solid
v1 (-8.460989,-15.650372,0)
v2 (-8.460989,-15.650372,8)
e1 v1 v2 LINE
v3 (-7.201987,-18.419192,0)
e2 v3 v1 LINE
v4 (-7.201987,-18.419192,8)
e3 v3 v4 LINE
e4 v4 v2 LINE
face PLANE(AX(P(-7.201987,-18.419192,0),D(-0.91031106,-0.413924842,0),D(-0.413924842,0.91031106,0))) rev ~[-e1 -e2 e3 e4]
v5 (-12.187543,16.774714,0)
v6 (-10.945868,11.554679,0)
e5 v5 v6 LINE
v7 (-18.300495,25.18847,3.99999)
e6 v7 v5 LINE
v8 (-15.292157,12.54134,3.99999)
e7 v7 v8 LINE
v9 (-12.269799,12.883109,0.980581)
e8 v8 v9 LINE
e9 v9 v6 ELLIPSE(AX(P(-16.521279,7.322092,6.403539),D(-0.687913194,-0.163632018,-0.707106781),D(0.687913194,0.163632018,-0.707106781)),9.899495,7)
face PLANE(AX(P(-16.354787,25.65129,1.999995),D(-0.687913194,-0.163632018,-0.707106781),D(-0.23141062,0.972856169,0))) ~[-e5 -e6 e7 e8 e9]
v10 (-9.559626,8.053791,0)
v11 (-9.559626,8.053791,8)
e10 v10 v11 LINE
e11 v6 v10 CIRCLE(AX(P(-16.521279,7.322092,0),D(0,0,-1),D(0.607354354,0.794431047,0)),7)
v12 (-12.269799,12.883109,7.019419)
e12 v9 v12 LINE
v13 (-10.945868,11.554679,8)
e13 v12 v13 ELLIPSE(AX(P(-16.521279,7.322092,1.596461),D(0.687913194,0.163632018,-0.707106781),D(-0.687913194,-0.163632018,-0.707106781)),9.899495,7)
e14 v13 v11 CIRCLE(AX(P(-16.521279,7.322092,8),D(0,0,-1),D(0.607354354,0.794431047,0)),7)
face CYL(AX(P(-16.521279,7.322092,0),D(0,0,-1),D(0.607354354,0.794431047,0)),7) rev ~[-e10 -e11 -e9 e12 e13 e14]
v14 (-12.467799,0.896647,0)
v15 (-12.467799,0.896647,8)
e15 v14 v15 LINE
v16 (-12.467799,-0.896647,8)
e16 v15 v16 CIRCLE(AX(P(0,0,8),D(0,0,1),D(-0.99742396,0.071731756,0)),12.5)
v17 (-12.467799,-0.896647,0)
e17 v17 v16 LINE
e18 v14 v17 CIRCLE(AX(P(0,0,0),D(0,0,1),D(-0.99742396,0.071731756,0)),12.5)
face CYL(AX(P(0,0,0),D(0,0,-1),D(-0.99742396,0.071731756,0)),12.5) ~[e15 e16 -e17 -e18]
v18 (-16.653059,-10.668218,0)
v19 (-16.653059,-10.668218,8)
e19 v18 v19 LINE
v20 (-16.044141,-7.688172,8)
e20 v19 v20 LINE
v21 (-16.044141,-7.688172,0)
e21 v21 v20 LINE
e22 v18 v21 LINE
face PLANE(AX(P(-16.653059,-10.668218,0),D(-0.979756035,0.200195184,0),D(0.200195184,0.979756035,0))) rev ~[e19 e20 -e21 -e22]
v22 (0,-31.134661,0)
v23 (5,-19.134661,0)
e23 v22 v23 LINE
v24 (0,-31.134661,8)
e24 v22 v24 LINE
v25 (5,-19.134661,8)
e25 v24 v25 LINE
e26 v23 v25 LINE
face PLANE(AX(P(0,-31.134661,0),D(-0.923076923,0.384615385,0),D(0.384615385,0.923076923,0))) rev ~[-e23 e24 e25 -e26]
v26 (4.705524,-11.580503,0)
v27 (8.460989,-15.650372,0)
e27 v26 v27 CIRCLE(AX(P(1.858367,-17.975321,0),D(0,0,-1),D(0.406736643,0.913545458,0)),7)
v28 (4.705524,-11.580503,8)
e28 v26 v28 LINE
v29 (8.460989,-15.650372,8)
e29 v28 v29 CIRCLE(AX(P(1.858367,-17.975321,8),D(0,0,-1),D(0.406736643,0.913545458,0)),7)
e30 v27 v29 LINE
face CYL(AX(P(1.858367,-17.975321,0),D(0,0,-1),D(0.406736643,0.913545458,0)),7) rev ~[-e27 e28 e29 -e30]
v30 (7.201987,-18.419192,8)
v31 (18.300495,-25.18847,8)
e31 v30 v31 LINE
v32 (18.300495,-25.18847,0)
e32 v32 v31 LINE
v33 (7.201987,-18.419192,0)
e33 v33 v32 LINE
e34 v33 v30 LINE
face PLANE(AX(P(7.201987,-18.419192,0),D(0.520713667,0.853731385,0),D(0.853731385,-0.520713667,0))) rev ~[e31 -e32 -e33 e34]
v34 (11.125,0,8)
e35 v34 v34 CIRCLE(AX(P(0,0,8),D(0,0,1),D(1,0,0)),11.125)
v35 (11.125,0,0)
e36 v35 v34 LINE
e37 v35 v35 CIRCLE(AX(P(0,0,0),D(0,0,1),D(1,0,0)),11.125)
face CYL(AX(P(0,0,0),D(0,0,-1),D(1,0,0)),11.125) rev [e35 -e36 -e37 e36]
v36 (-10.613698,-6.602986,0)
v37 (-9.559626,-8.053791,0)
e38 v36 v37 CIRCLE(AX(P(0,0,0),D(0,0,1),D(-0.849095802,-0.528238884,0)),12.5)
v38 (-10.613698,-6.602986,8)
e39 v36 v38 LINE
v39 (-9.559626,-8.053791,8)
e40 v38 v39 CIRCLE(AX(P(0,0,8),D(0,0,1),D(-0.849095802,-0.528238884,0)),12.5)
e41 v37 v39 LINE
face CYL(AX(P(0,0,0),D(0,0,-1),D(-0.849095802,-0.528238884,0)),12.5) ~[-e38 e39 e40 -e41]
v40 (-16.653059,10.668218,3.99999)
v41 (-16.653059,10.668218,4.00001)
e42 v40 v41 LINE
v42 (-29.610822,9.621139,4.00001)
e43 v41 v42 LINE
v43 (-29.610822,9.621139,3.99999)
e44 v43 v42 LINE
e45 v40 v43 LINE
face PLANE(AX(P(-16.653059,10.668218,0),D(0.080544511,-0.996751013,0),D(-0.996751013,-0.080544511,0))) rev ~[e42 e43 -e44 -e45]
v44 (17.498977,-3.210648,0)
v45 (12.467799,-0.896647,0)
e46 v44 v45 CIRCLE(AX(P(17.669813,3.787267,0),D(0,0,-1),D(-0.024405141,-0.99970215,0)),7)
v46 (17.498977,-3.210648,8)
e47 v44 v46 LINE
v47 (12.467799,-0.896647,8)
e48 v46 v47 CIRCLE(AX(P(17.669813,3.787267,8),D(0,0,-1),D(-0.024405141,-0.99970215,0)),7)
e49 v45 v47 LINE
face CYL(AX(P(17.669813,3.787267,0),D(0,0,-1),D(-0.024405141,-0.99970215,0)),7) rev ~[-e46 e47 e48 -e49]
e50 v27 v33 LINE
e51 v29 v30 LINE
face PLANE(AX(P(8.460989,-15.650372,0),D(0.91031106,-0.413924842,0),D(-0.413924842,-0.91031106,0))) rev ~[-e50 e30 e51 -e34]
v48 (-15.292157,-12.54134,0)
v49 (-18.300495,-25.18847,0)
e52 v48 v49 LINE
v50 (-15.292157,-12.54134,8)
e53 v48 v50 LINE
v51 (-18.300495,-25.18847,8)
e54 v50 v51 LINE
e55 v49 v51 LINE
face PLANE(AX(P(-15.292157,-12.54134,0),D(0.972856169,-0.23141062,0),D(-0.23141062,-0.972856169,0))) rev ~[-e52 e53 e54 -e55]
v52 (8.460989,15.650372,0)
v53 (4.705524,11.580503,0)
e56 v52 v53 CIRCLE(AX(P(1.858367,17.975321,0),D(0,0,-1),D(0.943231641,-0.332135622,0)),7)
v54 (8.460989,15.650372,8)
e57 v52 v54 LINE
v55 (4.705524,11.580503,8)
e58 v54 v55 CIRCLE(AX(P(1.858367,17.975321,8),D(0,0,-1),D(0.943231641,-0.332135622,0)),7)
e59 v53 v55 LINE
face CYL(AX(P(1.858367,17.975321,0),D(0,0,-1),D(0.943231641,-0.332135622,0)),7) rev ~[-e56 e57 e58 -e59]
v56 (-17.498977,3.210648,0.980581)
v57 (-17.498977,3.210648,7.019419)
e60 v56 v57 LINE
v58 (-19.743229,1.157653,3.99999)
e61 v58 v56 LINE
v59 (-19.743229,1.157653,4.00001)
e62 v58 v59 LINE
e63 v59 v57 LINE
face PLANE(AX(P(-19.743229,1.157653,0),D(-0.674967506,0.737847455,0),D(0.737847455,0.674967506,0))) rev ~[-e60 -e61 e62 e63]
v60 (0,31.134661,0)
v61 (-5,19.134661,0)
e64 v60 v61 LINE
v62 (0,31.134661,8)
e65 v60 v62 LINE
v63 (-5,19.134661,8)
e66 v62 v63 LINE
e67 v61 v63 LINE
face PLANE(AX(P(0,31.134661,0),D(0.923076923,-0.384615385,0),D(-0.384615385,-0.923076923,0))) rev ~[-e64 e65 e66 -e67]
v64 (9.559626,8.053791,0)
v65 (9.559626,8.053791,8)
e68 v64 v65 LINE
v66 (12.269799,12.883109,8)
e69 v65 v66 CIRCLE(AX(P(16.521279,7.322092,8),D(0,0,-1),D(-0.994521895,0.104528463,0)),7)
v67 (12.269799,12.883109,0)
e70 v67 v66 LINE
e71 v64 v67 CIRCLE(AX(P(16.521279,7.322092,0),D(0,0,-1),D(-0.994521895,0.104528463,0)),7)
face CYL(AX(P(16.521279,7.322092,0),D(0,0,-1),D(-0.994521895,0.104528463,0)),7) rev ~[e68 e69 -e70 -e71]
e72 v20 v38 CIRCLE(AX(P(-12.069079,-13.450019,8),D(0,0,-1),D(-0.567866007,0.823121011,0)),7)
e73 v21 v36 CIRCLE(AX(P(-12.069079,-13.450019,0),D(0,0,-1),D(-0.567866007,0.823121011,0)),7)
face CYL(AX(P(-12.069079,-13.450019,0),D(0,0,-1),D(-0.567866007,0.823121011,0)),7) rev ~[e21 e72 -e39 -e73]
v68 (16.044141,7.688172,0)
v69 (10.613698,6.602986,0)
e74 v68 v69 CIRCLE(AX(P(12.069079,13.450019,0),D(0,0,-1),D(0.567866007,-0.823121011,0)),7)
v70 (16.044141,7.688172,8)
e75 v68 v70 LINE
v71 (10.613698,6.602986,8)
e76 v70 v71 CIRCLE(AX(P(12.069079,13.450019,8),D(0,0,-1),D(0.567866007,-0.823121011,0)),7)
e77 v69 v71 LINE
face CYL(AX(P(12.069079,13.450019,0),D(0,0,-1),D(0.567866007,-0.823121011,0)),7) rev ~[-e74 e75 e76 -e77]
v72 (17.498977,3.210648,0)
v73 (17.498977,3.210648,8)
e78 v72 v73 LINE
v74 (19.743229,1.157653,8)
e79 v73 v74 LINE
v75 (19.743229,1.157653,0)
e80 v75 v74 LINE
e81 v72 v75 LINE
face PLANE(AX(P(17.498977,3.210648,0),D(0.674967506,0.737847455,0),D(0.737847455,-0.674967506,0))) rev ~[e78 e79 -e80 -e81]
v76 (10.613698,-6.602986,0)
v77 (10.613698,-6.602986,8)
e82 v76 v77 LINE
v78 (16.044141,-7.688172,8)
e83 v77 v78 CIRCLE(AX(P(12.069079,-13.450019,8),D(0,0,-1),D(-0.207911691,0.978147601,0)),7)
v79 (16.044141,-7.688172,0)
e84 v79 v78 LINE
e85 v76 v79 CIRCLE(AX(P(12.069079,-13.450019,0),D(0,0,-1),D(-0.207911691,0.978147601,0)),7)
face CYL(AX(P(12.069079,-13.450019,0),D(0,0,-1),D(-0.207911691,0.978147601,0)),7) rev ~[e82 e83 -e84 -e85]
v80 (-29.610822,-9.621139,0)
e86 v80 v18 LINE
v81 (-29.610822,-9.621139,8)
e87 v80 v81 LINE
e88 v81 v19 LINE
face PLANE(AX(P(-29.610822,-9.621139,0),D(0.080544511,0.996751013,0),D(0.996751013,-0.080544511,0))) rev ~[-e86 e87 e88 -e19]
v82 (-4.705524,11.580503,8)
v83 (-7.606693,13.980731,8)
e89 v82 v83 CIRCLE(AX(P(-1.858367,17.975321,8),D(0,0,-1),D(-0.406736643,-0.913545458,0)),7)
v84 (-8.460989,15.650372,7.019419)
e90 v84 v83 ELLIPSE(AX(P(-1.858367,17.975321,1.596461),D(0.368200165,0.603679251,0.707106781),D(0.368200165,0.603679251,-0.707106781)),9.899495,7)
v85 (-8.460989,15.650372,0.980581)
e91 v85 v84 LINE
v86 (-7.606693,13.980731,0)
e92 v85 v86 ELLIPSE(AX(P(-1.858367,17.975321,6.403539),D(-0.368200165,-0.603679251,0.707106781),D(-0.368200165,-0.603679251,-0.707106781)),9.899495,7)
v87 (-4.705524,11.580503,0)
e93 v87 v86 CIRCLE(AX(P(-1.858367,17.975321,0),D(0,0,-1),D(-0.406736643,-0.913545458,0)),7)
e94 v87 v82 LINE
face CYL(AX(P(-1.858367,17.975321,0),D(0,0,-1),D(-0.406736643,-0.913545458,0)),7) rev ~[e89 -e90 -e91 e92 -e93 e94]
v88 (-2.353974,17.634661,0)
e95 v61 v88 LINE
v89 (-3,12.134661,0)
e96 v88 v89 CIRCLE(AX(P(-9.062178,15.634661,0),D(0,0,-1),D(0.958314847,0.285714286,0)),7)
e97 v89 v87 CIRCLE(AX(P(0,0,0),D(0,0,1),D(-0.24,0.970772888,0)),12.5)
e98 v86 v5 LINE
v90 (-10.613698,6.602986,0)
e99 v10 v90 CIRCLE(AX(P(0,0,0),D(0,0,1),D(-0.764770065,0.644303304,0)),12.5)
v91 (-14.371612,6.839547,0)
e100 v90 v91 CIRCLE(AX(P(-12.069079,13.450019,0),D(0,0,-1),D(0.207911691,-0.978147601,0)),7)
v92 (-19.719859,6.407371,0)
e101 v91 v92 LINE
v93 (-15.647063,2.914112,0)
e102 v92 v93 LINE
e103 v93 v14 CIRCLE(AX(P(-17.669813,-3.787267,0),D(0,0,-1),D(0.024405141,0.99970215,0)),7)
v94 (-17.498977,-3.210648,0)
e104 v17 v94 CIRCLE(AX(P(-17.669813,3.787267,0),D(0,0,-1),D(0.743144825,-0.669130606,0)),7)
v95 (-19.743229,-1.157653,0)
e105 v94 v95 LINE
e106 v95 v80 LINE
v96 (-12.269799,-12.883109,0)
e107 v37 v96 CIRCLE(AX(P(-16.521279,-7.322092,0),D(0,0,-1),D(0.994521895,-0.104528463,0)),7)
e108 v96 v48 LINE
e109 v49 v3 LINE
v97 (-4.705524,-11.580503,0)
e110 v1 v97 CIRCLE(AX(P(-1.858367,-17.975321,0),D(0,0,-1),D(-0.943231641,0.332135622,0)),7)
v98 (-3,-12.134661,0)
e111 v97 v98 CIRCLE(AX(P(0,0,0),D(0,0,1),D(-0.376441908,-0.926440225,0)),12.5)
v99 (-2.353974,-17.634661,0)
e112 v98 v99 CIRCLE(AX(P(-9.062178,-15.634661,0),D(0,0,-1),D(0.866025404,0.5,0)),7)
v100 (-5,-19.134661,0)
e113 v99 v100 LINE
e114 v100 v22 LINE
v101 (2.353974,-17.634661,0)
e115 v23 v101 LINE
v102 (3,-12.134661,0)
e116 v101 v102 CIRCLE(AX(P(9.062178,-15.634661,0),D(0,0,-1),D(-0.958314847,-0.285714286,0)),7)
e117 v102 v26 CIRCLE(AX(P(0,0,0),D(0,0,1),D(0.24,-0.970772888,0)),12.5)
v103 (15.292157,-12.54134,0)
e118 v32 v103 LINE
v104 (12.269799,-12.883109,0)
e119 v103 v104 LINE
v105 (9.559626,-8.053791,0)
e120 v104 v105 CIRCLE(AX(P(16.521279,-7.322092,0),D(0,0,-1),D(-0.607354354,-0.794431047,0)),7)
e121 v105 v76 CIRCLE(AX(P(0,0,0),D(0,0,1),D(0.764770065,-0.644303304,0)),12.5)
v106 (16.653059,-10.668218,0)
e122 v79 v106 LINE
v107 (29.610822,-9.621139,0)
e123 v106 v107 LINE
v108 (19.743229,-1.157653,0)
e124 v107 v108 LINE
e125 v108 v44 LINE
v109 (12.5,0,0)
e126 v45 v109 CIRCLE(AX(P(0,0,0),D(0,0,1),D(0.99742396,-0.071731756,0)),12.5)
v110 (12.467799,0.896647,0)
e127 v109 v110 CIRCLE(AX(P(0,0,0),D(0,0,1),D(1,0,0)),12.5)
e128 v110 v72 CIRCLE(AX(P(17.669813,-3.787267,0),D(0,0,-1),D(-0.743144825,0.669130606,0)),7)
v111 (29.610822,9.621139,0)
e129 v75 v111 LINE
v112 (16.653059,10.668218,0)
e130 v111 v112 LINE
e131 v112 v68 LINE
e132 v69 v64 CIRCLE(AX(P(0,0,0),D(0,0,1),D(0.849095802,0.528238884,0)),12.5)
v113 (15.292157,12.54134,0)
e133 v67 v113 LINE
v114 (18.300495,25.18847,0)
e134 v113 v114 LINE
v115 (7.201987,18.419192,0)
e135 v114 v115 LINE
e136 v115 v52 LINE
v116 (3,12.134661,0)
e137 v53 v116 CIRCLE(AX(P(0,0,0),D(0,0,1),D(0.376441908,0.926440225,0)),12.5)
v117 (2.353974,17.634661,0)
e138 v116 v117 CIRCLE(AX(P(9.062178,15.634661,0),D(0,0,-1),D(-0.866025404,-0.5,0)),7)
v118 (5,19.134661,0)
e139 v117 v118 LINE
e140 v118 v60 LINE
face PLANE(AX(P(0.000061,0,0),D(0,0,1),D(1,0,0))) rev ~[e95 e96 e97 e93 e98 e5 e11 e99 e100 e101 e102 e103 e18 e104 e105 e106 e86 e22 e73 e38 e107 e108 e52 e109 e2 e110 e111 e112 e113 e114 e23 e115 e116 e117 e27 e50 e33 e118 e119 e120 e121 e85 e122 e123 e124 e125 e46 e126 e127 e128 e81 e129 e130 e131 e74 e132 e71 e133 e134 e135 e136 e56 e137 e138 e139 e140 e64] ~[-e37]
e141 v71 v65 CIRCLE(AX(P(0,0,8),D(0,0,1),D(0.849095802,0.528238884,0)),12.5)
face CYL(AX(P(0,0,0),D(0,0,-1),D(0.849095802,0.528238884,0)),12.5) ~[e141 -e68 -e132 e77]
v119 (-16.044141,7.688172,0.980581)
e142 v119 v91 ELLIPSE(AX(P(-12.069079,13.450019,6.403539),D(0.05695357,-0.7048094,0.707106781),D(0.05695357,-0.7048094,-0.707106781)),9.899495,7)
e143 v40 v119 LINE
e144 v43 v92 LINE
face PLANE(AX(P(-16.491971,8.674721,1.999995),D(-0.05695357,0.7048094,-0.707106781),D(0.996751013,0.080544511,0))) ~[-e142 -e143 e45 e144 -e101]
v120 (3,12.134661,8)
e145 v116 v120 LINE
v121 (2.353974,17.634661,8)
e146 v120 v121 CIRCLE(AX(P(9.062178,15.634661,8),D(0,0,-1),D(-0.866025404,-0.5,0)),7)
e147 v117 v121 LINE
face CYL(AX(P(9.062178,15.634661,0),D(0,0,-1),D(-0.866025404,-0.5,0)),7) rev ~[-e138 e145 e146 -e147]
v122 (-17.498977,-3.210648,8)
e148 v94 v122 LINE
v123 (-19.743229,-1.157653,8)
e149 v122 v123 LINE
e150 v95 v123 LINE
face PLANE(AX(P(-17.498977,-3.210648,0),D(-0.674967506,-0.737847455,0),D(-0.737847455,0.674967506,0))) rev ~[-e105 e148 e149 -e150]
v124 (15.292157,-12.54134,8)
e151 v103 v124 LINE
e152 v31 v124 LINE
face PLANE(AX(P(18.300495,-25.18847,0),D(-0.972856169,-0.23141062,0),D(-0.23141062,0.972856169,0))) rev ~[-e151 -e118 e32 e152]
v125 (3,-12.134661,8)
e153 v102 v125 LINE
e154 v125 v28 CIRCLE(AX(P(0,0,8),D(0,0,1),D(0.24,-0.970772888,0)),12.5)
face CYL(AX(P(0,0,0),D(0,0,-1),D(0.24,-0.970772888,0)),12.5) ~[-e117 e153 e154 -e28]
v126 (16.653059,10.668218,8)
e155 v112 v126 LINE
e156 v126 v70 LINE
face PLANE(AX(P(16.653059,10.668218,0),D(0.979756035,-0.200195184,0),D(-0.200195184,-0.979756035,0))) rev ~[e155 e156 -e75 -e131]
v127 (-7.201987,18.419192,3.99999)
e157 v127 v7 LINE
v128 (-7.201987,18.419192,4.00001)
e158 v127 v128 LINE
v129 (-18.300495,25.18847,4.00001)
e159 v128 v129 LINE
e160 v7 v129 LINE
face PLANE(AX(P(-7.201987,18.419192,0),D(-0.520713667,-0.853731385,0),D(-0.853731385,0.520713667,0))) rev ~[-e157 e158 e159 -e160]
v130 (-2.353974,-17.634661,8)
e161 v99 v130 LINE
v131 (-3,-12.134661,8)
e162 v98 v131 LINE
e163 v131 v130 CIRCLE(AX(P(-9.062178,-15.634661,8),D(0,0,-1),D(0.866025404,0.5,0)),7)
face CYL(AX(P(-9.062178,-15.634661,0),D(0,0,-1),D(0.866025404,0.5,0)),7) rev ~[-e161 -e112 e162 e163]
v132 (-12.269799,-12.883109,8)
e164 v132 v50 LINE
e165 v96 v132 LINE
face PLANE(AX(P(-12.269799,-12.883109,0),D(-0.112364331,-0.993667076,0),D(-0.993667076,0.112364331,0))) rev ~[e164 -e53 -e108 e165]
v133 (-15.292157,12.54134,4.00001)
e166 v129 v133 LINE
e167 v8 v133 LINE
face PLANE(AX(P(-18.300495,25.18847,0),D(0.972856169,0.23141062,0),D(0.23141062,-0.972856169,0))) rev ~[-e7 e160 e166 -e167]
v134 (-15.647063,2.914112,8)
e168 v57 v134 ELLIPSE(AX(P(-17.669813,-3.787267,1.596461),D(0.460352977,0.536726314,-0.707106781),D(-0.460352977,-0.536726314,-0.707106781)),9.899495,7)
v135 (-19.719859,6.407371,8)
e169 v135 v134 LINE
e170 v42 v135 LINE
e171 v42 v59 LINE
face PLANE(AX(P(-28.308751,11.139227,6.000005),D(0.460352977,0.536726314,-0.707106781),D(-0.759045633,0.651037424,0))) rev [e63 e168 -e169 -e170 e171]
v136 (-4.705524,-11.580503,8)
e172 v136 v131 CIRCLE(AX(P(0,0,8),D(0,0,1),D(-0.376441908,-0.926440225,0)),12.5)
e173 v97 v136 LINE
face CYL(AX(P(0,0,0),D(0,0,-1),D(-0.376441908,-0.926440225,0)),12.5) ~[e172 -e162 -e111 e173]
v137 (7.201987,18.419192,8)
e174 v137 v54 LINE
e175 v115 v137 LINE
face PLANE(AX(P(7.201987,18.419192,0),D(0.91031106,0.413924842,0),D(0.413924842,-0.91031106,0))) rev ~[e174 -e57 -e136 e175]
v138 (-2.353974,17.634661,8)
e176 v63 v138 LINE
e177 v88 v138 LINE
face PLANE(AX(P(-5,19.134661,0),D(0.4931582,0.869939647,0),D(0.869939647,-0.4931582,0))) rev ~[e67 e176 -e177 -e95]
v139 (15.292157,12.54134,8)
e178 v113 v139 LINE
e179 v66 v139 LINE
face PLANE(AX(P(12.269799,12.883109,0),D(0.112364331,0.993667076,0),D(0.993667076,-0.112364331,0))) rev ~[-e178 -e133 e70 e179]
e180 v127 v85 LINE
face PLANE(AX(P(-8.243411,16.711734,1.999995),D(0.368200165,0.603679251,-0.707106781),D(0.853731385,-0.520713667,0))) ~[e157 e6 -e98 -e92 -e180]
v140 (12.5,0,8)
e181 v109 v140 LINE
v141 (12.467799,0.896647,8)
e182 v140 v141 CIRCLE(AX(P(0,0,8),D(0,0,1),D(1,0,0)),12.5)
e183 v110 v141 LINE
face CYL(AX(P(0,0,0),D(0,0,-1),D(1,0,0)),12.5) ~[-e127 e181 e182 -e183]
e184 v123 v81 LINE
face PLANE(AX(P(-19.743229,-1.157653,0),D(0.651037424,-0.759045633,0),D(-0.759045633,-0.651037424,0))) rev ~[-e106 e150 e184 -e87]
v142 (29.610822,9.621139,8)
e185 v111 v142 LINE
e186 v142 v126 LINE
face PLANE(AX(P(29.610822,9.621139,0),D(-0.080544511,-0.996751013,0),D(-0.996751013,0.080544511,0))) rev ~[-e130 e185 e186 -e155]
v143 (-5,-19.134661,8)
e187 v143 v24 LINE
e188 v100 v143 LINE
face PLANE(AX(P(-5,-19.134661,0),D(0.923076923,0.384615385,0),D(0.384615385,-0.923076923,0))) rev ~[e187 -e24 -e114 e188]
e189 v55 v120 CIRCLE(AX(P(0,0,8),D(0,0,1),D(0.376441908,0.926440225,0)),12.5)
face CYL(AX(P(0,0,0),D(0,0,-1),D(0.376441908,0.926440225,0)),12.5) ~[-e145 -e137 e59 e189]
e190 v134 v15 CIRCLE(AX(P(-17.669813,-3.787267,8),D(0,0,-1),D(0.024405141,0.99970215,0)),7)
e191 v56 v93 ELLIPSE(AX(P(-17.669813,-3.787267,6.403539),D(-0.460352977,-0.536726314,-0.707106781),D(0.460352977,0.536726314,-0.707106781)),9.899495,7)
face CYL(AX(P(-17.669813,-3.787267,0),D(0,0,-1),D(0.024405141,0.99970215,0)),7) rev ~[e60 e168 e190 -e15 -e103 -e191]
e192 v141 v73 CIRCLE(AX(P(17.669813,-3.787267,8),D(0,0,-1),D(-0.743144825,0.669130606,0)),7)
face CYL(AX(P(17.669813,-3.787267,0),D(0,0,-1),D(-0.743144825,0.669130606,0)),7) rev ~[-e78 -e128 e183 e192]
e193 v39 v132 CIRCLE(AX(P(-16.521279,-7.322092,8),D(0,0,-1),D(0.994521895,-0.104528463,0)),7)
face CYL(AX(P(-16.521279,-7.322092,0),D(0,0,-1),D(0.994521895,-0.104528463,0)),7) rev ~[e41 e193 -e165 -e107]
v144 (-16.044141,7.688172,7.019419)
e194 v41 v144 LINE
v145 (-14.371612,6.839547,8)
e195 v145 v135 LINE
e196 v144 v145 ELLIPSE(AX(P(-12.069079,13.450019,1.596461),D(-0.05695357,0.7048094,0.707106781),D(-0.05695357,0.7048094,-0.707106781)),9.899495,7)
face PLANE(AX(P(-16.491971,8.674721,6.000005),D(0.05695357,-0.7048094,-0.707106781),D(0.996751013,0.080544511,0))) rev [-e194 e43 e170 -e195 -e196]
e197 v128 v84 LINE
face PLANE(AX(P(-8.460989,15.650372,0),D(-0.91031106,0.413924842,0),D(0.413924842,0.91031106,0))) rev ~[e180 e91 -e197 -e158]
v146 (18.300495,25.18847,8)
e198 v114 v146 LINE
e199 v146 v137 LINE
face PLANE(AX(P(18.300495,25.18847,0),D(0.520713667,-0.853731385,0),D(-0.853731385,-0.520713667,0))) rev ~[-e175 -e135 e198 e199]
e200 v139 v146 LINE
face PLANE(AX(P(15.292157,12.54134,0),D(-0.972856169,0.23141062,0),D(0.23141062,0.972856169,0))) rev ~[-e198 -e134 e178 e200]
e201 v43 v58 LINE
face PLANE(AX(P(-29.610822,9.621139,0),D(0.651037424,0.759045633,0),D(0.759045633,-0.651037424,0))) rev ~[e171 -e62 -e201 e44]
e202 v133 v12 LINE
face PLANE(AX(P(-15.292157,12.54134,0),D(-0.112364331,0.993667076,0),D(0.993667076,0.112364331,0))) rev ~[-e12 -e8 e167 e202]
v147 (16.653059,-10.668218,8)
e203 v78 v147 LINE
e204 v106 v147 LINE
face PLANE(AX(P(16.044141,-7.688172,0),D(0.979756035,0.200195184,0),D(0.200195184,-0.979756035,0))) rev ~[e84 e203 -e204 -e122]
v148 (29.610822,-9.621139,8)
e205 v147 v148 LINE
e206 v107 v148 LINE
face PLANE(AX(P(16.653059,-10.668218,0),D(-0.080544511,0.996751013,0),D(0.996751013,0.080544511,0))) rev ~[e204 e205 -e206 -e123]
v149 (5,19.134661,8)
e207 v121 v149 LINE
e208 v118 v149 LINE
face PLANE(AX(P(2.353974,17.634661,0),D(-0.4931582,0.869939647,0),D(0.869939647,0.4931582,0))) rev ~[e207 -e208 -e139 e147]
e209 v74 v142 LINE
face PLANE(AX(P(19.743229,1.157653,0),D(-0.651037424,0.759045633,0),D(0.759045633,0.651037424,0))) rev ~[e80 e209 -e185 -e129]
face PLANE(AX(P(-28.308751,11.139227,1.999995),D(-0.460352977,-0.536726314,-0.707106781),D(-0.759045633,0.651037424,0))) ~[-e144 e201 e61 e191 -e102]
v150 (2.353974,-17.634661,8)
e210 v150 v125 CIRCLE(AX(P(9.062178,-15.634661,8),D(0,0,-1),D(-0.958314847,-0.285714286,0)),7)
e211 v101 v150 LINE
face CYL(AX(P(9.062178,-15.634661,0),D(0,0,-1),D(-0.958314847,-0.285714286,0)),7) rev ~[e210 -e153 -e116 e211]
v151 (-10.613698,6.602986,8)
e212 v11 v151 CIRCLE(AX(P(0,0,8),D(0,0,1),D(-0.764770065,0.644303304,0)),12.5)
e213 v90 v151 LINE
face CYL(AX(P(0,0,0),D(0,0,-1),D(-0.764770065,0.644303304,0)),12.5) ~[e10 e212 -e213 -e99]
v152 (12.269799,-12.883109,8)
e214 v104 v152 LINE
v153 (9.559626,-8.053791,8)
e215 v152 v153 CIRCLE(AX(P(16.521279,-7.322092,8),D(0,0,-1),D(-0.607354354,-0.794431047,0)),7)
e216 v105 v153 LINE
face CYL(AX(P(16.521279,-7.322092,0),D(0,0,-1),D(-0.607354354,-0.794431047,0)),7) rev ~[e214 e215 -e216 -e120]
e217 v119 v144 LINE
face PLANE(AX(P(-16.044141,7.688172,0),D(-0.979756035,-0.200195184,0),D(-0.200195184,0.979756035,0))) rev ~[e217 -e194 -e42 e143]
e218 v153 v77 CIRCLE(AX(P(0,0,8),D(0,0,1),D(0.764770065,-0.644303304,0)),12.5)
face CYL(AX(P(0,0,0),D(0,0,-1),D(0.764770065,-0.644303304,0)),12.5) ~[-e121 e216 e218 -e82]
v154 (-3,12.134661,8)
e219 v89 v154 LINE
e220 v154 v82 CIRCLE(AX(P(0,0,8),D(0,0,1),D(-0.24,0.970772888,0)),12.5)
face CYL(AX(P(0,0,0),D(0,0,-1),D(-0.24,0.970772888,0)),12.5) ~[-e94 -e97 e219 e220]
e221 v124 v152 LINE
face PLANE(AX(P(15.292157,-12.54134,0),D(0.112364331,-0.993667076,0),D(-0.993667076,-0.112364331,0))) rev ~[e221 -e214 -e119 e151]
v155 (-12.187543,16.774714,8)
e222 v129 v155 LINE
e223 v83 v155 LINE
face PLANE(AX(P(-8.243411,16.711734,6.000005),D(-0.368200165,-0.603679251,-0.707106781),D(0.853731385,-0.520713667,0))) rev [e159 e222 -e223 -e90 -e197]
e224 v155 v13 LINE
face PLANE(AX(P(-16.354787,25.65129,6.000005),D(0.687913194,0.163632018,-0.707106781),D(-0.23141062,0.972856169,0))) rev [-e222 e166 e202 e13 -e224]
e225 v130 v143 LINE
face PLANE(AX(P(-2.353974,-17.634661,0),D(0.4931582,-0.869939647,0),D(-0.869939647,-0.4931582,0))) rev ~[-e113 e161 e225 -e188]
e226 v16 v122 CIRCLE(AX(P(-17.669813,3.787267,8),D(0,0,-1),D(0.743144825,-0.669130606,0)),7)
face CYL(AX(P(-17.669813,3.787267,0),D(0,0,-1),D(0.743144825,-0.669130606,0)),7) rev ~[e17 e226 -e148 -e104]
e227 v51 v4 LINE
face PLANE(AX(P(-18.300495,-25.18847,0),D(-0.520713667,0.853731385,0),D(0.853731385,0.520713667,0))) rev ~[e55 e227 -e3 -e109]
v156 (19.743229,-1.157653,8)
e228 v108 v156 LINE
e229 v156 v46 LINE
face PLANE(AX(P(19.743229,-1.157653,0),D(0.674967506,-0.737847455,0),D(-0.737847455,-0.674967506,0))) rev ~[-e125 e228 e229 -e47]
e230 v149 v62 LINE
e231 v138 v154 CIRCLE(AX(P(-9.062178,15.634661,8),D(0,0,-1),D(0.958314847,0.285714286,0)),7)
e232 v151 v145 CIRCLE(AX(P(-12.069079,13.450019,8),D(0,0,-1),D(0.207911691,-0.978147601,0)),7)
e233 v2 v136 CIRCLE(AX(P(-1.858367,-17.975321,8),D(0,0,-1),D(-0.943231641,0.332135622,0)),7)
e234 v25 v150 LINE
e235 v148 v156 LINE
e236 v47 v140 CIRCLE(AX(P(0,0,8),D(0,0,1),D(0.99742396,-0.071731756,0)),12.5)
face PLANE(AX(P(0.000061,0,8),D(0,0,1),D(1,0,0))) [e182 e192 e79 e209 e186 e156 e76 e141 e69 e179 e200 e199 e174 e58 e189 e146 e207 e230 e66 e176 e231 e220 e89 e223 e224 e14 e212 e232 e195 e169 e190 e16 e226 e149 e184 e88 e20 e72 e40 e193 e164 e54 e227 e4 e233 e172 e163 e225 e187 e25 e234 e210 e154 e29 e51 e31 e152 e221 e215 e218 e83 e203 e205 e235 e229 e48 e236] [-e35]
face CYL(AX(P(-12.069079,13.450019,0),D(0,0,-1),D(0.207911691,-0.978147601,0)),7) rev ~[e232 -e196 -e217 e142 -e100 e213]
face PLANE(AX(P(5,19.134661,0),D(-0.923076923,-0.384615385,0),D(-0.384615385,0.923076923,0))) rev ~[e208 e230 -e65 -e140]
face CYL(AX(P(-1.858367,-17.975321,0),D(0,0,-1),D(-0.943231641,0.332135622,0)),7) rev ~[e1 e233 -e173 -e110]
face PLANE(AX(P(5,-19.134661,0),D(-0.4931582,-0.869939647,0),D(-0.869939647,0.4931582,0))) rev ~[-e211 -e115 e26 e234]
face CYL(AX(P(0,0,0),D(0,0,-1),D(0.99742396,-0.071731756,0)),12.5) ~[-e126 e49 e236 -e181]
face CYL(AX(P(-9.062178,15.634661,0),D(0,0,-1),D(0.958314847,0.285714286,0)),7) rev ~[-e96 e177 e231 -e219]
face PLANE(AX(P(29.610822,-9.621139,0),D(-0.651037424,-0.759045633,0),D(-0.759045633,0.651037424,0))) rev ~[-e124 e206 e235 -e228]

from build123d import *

# Parameters (mm, degrees)
F0_R     = 11.125
F1_DEPTH = 8
F2_SIZE  = 3.99999


# Not quite as in the source:
# - a fillet or chamfer is up to 0.001 mm smaller than in the source, because OpenCascade refuses the exact size


with BuildPart() as f1:
    # F0 (on Top) → F1 (new body)
    with BuildSketch(Plane.XY):
        with BuildLine():
            ThreePointArc((12.4677994948, -0.8966469518), (12.4919472799, -0.44861248), (12.5, 0))
            ThreePointArc((12.5, 0), (12.4919472799, 0.44861248), (12.4677994948, 0.8966469518))
            ThreePointArc((12.4677994948, 0.8966469518), (11.8882064537, 3.8627124297), (10.6136975286, 6.6029860496))
            ThreePointArc((10.6136975286, 6.6029860496), (10.1127124297, 7.3473156537), (9.559625819, 8.0537912936))
            ThreePointArc((9.559625819, 8.0537912936), (7.3473156537, 10.1127124297), (4.7055238527, 11.5805028074))
            ThreePointArc((4.7055238527, 11.5805028074), (3.8627124297, 11.8882064537), (3, 12.1346610995))
            ThreePointArc((3, 12.1346610995), (0, 12.5), (-3, 12.1346610995))
            ThreePointArc((-3, 12.1346610995), (-3.8627124297, 11.8882064537), (-4.7055238527, 11.5805028074))
            ThreePointArc((-4.7055238527, 11.5805028074), (-7.3473156537, 10.1127124297), (-9.559625819, 8.0537912936))
            ThreePointArc((-9.559625819, 8.0537912936), (-10.1127124297, 7.3473156537), (-10.6136975286, 6.6029860496))
            ThreePointArc((-10.6136975286, 6.6029860496), (-11.8882064537, 3.8627124297), (-12.4677994948, 0.8966469518))
            ThreePointArc((-12.4677994948, 0.8966469518), (-12.5, 0), (-12.4677994948, -0.8966469518))
            ThreePointArc((-12.4677994948, -0.8966469518), (-11.8882064537, -3.8627124297), (-10.6136975286, -6.6029860496))
            ThreePointArc((-10.6136975286, -6.6029860496), (-10.1127124297, -7.3473156537), (-9.559625819, -8.0537912936))
            ThreePointArc((-9.559625819, -8.0537912936), (-7.3473156537, -10.1127124297), (-4.7055238527, -11.5805028074))
            ThreePointArc((-4.7055238527, -11.5805028074), (-3.8627124297, -11.8882064537), (-3, -12.1346610995))
            ThreePointArc((-3, -12.1346610995), (0, -12.5), (3, -12.1346610995))
            ThreePointArc((3, -12.1346610995), (3.8627124297, -11.8882064537), (4.7055238527, -11.5805028074))
            ThreePointArc((4.7055238527, -11.5805028074), (7.3473156537, -10.1127124297), (9.559625819, -8.0537912936))
            ThreePointArc((9.559625819, -8.0537912936), (10.1127124297, -7.3473156537), (10.6136975286, -6.6029860496))
            ThreePointArc((10.6136975286, -6.6029860496), (11.8882064537, -3.8627124297), (12.4677994948, -0.8966469518))
        make_face()
        Circle(F0_R, mode=Mode.SUBTRACT)
        with BuildLine():
            ThreePointArc((10.6136975286, 6.6029860496), (11.8882064537, 3.8627124297), (12.4677994948, 0.8966469518))
            ThreePointArc((12.4677994948, 0.8966469518), (14.7448297559, 2.5723295046), (17.4989772889, 3.2106477587))
            ThreePointArc((17.4989772889, 3.2106477587), (18.3165016402, 3.1827968502), (19.1251951089, 3.0597659125))
            Line((19.1251951089, 3.0597659125), (17.2710931427, 8.7661050102))
            ThreePointArc((17.2710931427, 8.7661050102), (16.689162154, 8.1912327962), (16.0441414138, 7.6881721809))
            ThreePointArc((16.0441414138, 7.6881721809), (13.4407951985, 6.5857351937), (10.6136975286, 6.6029860496))
        make_face()
        with BuildLine():
            ThreePointArc((17.4989772889, -3.2106477587), (14.7448297559, -2.5723295046), (12.4677994948, -0.8966469518))
            ThreePointArc((12.4677994948, -0.8966469518), (11.8882064537, -3.8627124297), (10.6136975286, -6.6029860496))
            ThreePointArc((10.6136975286, -6.6029860496), (13.4407951985, -6.5857351937), (16.0441414138, -7.6881721809))
            ThreePointArc((16.0441414138, -7.6881721809), (16.689162154, -8.1912327962), (17.2710931427, -8.7661050102))
            Line((17.2710931427, -8.7661050102), (19.1251951089, -3.0597659125))
            ThreePointArc((19.1251951089, -3.0597659125), (18.3165016402, -3.1827968502), (17.4989772889, -3.2106477587))
        make_face()
        with BuildLine():
            ThreePointArc((19.1251951089, 3.0597659125), (18.3165016402, 3.1827968502), (17.4989772889, 3.2106477587))
            Line((17.4989772889, 3.2106477587), (19.7432290977, 1.1576528799))
            Line((19.7432290977, 1.1576528799), (19.1251951089, 3.0597659125))
        make_face()
        with BuildLine():
            Line((19.7432290977, -1.1576528799), (17.4989772889, -3.2106477587))
            ThreePointArc((17.4989772889, -3.2106477587), (18.3165016402, -3.1827968502), (19.1251951089, -3.0597659125))
            Line((19.1251951089, -3.0597659125), (19.7432290977, -1.1576528799))
        make_face()
        with BuildLine():
            ThreePointArc((4.7055238527, 11.5805028074), (7.3473156537, 10.1127124297), (9.559625819, 8.0537912936))
            ThreePointArc((9.559625819, 8.0537912936), (10.4168405049, 10.7478517624), (12.269798608, 12.8831093804))
            ThreePointArc((12.269798608, 12.8831093804), (12.9475600548, 13.3411062792), (13.674122585, 13.7169102542))
            Line((13.674122585, 13.7169102542), (8.8200206188, 17.243621768))
            ThreePointArc((8.8200206188, 17.243621768), (8.6871299688, 16.4364899243), (8.4609888389, 15.6503716587))
            ThreePointArc((8.4609888389, 15.6503716587), (7.0028337111, 13.228272889), (4.7055238527, 11.5805028074))
        make_face()
        with BuildLine():
            Line((16.6530591539, 10.6682180428), (16.0441414138, 7.6881721809))
            ThreePointArc((16.0441414138, 7.6881721809), (16.689162154, 8.1912327962), (17.2710931427, 8.7661050102))
            Line((17.2710931427, 8.7661050102), (16.6530591539, 10.6682180428))
        make_face()
        Polygon((17.2710931427, 8.7661050102), (19.1251951089, 3.0597659125), (19.7432290977, 1.1576528799), (29.6108223213, 9.6211393939), (16.6530591539, 10.6682180428), align=None)
        with BuildLine():
            ThreePointArc((12.269798608, -12.8831093804), (10.4168405049, -10.7478517624), (9.559625819, -8.0537912936))
            ThreePointArc((9.559625819, -8.0537912936), (7.3473156537, -10.1127124297), (4.7055238527, -11.5805028074))
            ThreePointArc((4.7055238527, -11.5805028074), (7.0028337111, -13.228272889), (8.4609888389, -15.6503716587))
            ThreePointArc((8.4609888389, -15.6503716587), (8.6871299688, -16.4364899243), (8.8200206188, -17.243621768))
            Line((8.8200206188, -17.243621768), (13.674122585, -13.7169102542))
            ThreePointArc((13.674122585, -13.7169102542), (12.9475600548, -13.3411062792), (12.269798608, -12.8831093804))
        make_face()
        with BuildLine():
            ThreePointArc((17.2710931427, -8.7661050102), (16.689162154, -8.1912327962), (16.0441414138, -7.6881721809))
            Line((16.0441414138, -7.6881721809), (16.6530591539, -10.6682180428))
            Line((16.6530591539, -10.6682180428), (17.2710931427, -8.7661050102))
        make_face()
        Polygon((19.7432290977, -1.1576528799), (19.1251951089, -3.0597659125), (17.2710931427, -8.7661050102), (16.6530591539, -10.6682180428), (29.6108223213, -9.6211393939), align=None)
        with BuildLine():
            ThreePointArc((13.674122585, 13.7169102542), (12.9475600548, 13.3411062792), (12.269798608, 12.8831093804))
            Line((12.269798608, 12.8831093804), (15.2921565738, 12.5413397496))
            Line((15.2921565738, 12.5413397496), (13.674122585, 13.7169102542))
        make_face()
        with BuildLine():
            Line((15.2921565738, -12.5413397496), (12.269798608, -12.8831093804))
            ThreePointArc((12.269798608, -12.8831093804), (12.9475600548, -13.3411062792), (13.674122585, -13.7169102542))
            Line((13.674122585, -13.7169102542), (15.2921565738, -12.5413397496))
        make_face()
        with BuildLine():
            ThreePointArc((-3, 12.1346610995), (0, 12.5), (3, 12.1346610995))
            ThreePointArc((3, 12.1346610995), (2.1099722363, 14.818059953), (2.353973894, 17.6346610995))
            ThreePointArc((2.353973894, 17.6346610995), (2.6330905999, 18.403566557), (3, 19.1346610995))
            Line((3, 19.1346610995), (-3, 19.1346610995))
            ThreePointArc((-3, 19.1346610995), (-2.6330905999, 18.403566557), (-2.353973894, 17.6346610995))
            ThreePointArc((-2.353973894, 17.6346610995), (-2.1099722363, 14.818059953), (-3, 12.1346610995))
        make_face()
        with BuildLine():
            Line((7.20198663, 18.4191922726), (8.4609888389, 15.6503716587))
            ThreePointArc((8.4609888389, 15.6503716587), (8.6871299688, 16.4364899243), (8.8200206188, 17.243621768))
            Line((8.8200206188, 17.243621768), (7.20198663, 18.4191922726))
        make_face()
        Polygon((8.8200206188, 17.243621768), (13.674122585, 13.7169102542), (15.2921565738, 12.5413397496), (18.3004946294, 25.1884699436), (7.20198663, 18.4191922726), align=None)
        with BuildLine():
            ThreePointArc((2.353973894, -17.6346610995), (2.1099722363, -14.818059953), (3, -12.1346610995))
            ThreePointArc((3, -12.1346610995), (0, -12.5), (-3, -12.1346610995))
            ThreePointArc((-3, -12.1346610995), (-2.1099722363, -14.818059953), (-2.353973894, -17.6346610995))
            ThreePointArc((-2.353973894, -17.6346610995), (-2.6330905999, -18.403566557), (-3, -19.1346610995))
            Line((-3, -19.1346610995), (3, -19.1346610995))
            ThreePointArc((3, -19.1346610995), (2.6330905999, -18.403566557), (2.353973894, -17.6346610995))
        make_face()
        with BuildLine():
            ThreePointArc((8.8200206188, -17.243621768), (8.6871299688, -16.4364899243), (8.4609888389, -15.6503716587))
            Line((8.4609888389, -15.6503716587), (7.20198663, -18.4191922726))
            Line((7.20198663, -18.4191922726), (8.8200206188, -17.243621768))
        make_face()
        Polygon((15.2921565738, -12.5413397496), (13.674122585, -13.7169102542), (8.8200206188, -17.243621768), (7.20198663, -18.4191922726), (18.3004946294, -25.1884699436), align=None)
        with BuildLine():
            ThreePointArc((3, 19.1346610995), (2.6330905999, 18.403566557), (2.353973894, 17.6346610995))
            Line((2.353973894, 17.6346610995), (5, 19.1346610995))
            Line((5, 19.1346610995), (3, 19.1346610995))
        make_face()
        with BuildLine():
            Line((5, -19.1346610995), (2.353973894, -17.6346610995))
            ThreePointArc((2.353973894, -17.6346610995), (2.6330905999, -18.403566557), (3, -19.1346610995))
            Line((3, -19.1346610995), (5, -19.1346610995))
        make_face()
        with BuildLine():
            ThreePointArc((-9.559625819, 8.0537912936), (-7.3473156537, 10.1127124297), (-4.7055238527, 11.5805028074))
            ThreePointArc((-4.7055238527, 11.5805028074), (-7.0028337111, 13.228272889), (-8.4609888389, 15.6503716587))
            ThreePointArc((-8.4609888389, 15.6503716587), (-8.6871299688, 16.4364899243), (-8.8200206188, 17.243621768))
            Line((-8.8200206188, 17.243621768), (-13.674122585, 13.7169102542))
            ThreePointArc((-13.674122585, 13.7169102542), (-12.9475600548, 13.3411062792), (-12.269798608, 12.8831093804))
            ThreePointArc((-12.269798608, 12.8831093804), (-10.4168405049, 10.7478517624), (-9.559625819, 8.0537912936))
        make_face()
        with BuildLine():
            Line((-5, 19.1346610995), (-2.353973894, 17.6346610995))
            ThreePointArc((-2.353973894, 17.6346610995), (-2.6330905999, 18.403566557), (-3, 19.1346610995))
            Line((-3, 19.1346610995), (-5, 19.1346610995))
        make_face()
        Polygon((-3, 19.1346610995), (3, 19.1346610995), (5, 19.1346610995), (0, 31.1346610995), (-5, 19.1346610995), align=None)
        with BuildLine():
            ThreePointArc((-8.4609888389, -15.6503716587), (-7.0028337111, -13.228272889), (-4.7055238527, -11.5805028074))
            ThreePointArc((-4.7055238527, -11.5805028074), (-7.3473156537, -10.1127124297), (-9.559625819, -8.0537912936))
            ThreePointArc((-9.559625819, -8.0537912936), (-10.4168405049, -10.7478517624), (-12.269798608, -12.8831093804))
            ThreePointArc((-12.269798608, -12.8831093804), (-12.9475600548, -13.3411062792), (-13.674122585, -13.7169102542))
            Line((-13.674122585, -13.7169102542), (-8.8200206188, -17.243621768))
            ThreePointArc((-8.8200206188, -17.243621768), (-8.6871299688, -16.4364899243), (-8.4609888389, -15.6503716587))
        make_face()
        with BuildLine():
            ThreePointArc((-3, -19.1346610995), (-2.6330905999, -18.403566557), (-2.353973894, -17.6346610995))
            Line((-2.353973894, -17.6346610995), (-5, -19.1346610995))
            Line((-5, -19.1346610995), (-3, -19.1346610995))
        make_face()
        Polygon((5, -19.1346610995), (3, -19.1346610995), (-3, -19.1346610995), (-5, -19.1346610995), (0, -31.1346610995), align=None)
        with BuildLine():
            ThreePointArc((-8.8200206188, 17.243621768), (-8.6871299688, 16.4364899243), (-8.4609888389, 15.6503716587))
            Line((-8.4609888389, 15.6503716587), (-7.20198663, 18.4191922726))
            Line((-7.20198663, 18.4191922726), (-8.8200206188, 17.243621768))
        make_face()
        with BuildLine():
            Line((-7.20198663, -18.4191922726), (-8.4609888389, -15.6503716587))
            ThreePointArc((-8.4609888389, -15.6503716587), (-8.6871299688, -16.4364899243), (-8.8200206188, -17.243621768))
            Line((-8.8200206188, -17.243621768), (-7.20198663, -18.4191922726))
        make_face()
        with BuildLine():
            ThreePointArc((-12.4677994948, 0.8966469518), (-11.8882064537, 3.8627124297), (-10.6136975286, 6.6029860496))
            ThreePointArc((-10.6136975286, 6.6029860496), (-13.4407951985, 6.5857351937), (-16.0441414138, 7.6881721809))
            ThreePointArc((-16.0441414138, 7.6881721809), (-16.689162154, 8.1912327962), (-17.2710931427, 8.7661050102))
            Line((-17.2710931427, 8.7661050102), (-19.1251951089, 3.0597659125))
            ThreePointArc((-19.1251951089, 3.0597659125), (-18.3165016402, 3.1827968502), (-17.4989772889, 3.2106477587))
            ThreePointArc((-17.4989772889, 3.2106477587), (-14.7448297559, 2.5723295046), (-12.4677994948, 0.8966469518))
        make_face()
        with BuildLine():
            Line((-15.2921565738, 12.5413397496), (-12.269798608, 12.8831093804))
            ThreePointArc((-12.269798608, 12.8831093804), (-12.9475600548, 13.3411062792), (-13.674122585, 13.7169102542))
            Line((-13.674122585, 13.7169102542), (-15.2921565738, 12.5413397496))
        make_face()
        Polygon((-13.674122585, 13.7169102542), (-8.8200206188, 17.243621768), (-7.20198663, 18.4191922726), (-18.3004946294, 25.1884699436), (-15.2921565738, 12.5413397496), align=None)
        with BuildLine():
            ThreePointArc((-16.0441414138, -7.6881721809), (-13.4407951985, -6.5857351937), (-10.6136975286, -6.6029860496))
            ThreePointArc((-10.6136975286, -6.6029860496), (-11.8882064537, -3.8627124297), (-12.4677994948, -0.8966469518))
            ThreePointArc((-12.4677994948, -0.8966469518), (-14.7448297559, -2.5723295046), (-17.4989772889, -3.2106477587))
            ThreePointArc((-17.4989772889, -3.2106477587), (-18.3165016402, -3.1827968502), (-19.1251951089, -3.0597659125))
            Line((-19.1251951089, -3.0597659125), (-17.2710931427, -8.7661050102))
            ThreePointArc((-17.2710931427, -8.7661050102), (-16.689162154, -8.1912327962), (-16.0441414138, -7.6881721809))
        make_face()
        with BuildLine():
            ThreePointArc((-13.674122585, -13.7169102542), (-12.9475600548, -13.3411062792), (-12.269798608, -12.8831093804))
            Line((-12.269798608, -12.8831093804), (-15.2921565738, -12.5413397496))
            Line((-15.2921565738, -12.5413397496), (-13.674122585, -13.7169102542))
        make_face()
        Polygon((-7.20198663, -18.4191922726), (-8.8200206188, -17.243621768), (-13.674122585, -13.7169102542), (-15.2921565738, -12.5413397496), (-18.3004946294, -25.1884699436), align=None)
        with BuildLine():
            ThreePointArc((-17.2710931427, 8.7661050102), (-16.689162154, 8.1912327962), (-16.0441414138, 7.6881721809))
            Line((-16.0441414138, 7.6881721809), (-16.6530591539, 10.6682180428))
            Line((-16.6530591539, 10.6682180428), (-17.2710931427, 8.7661050102))
        make_face()
        with BuildLine():
            Line((-16.6530591539, -10.6682180428), (-16.0441414138, -7.6881721809))
            ThreePointArc((-16.0441414138, -7.6881721809), (-16.689162154, -8.1912327962), (-17.2710931427, -8.7661050102))
            Line((-17.2710931427, -8.7661050102), (-16.6530591539, -10.6682180428))
        make_face()
        with BuildLine():
            Line((-19.7432290977, 1.1576528799), (-17.4989772889, 3.2106477587))
            ThreePointArc((-17.4989772889, 3.2106477587), (-18.3165016402, 3.1827968502), (-19.1251951089, 3.0597659125))
            Line((-19.1251951089, 3.0597659125), (-19.7432290977, 1.1576528799))
        make_face()
        Polygon((-19.1251951089, 3.0597659125), (-17.2710931427, 8.7661050102), (-16.6530591539, 10.6682180428), (-29.6108223213, 9.6211393939), (-19.7432290977, 1.1576528799), align=None)
        with BuildLine():
            ThreePointArc((-19.1251951089, -3.0597659125), (-18.3165016402, -3.1827968502), (-17.4989772889, -3.2106477587))
            Line((-17.4989772889, -3.2106477587), (-19.7432290977, -1.1576528799))
            Line((-19.7432290977, -1.1576528799), (-19.1251951089, -3.0597659125))
        make_face()
        Polygon((-16.6530591539, -10.6682180428), (-17.2710931427, -8.7661050102), (-19.1251951089, -3.0597659125), (-19.7432290977, -1.1576528799), (-29.6108223213, -9.6211393939), align=None)
    extrude(amount=F1_DEPTH)

    # F2 (size 4 in the source; OpenCascade refuses exactly that, so slightly less here)
    f2_edges = [f1.edges().sort_by_distance(p)[0] for p in [
        (-16.796326, 18.864905, 8),
        (-12.751241, 21.803831, 8),
        (-12.751241, 21.803831, 0),
        (-16.796326, 18.864905, 0),
        (-23.131941, 10.144679, 8),
        (-24.677026, 5.389396, 8),
        (-24.677026, 5.389396, 0),
        (-23.131941, 10.144679, 0),
    ]]
    chamfer(f2_edges, length=F2_SIZE)


solid = f1.part
